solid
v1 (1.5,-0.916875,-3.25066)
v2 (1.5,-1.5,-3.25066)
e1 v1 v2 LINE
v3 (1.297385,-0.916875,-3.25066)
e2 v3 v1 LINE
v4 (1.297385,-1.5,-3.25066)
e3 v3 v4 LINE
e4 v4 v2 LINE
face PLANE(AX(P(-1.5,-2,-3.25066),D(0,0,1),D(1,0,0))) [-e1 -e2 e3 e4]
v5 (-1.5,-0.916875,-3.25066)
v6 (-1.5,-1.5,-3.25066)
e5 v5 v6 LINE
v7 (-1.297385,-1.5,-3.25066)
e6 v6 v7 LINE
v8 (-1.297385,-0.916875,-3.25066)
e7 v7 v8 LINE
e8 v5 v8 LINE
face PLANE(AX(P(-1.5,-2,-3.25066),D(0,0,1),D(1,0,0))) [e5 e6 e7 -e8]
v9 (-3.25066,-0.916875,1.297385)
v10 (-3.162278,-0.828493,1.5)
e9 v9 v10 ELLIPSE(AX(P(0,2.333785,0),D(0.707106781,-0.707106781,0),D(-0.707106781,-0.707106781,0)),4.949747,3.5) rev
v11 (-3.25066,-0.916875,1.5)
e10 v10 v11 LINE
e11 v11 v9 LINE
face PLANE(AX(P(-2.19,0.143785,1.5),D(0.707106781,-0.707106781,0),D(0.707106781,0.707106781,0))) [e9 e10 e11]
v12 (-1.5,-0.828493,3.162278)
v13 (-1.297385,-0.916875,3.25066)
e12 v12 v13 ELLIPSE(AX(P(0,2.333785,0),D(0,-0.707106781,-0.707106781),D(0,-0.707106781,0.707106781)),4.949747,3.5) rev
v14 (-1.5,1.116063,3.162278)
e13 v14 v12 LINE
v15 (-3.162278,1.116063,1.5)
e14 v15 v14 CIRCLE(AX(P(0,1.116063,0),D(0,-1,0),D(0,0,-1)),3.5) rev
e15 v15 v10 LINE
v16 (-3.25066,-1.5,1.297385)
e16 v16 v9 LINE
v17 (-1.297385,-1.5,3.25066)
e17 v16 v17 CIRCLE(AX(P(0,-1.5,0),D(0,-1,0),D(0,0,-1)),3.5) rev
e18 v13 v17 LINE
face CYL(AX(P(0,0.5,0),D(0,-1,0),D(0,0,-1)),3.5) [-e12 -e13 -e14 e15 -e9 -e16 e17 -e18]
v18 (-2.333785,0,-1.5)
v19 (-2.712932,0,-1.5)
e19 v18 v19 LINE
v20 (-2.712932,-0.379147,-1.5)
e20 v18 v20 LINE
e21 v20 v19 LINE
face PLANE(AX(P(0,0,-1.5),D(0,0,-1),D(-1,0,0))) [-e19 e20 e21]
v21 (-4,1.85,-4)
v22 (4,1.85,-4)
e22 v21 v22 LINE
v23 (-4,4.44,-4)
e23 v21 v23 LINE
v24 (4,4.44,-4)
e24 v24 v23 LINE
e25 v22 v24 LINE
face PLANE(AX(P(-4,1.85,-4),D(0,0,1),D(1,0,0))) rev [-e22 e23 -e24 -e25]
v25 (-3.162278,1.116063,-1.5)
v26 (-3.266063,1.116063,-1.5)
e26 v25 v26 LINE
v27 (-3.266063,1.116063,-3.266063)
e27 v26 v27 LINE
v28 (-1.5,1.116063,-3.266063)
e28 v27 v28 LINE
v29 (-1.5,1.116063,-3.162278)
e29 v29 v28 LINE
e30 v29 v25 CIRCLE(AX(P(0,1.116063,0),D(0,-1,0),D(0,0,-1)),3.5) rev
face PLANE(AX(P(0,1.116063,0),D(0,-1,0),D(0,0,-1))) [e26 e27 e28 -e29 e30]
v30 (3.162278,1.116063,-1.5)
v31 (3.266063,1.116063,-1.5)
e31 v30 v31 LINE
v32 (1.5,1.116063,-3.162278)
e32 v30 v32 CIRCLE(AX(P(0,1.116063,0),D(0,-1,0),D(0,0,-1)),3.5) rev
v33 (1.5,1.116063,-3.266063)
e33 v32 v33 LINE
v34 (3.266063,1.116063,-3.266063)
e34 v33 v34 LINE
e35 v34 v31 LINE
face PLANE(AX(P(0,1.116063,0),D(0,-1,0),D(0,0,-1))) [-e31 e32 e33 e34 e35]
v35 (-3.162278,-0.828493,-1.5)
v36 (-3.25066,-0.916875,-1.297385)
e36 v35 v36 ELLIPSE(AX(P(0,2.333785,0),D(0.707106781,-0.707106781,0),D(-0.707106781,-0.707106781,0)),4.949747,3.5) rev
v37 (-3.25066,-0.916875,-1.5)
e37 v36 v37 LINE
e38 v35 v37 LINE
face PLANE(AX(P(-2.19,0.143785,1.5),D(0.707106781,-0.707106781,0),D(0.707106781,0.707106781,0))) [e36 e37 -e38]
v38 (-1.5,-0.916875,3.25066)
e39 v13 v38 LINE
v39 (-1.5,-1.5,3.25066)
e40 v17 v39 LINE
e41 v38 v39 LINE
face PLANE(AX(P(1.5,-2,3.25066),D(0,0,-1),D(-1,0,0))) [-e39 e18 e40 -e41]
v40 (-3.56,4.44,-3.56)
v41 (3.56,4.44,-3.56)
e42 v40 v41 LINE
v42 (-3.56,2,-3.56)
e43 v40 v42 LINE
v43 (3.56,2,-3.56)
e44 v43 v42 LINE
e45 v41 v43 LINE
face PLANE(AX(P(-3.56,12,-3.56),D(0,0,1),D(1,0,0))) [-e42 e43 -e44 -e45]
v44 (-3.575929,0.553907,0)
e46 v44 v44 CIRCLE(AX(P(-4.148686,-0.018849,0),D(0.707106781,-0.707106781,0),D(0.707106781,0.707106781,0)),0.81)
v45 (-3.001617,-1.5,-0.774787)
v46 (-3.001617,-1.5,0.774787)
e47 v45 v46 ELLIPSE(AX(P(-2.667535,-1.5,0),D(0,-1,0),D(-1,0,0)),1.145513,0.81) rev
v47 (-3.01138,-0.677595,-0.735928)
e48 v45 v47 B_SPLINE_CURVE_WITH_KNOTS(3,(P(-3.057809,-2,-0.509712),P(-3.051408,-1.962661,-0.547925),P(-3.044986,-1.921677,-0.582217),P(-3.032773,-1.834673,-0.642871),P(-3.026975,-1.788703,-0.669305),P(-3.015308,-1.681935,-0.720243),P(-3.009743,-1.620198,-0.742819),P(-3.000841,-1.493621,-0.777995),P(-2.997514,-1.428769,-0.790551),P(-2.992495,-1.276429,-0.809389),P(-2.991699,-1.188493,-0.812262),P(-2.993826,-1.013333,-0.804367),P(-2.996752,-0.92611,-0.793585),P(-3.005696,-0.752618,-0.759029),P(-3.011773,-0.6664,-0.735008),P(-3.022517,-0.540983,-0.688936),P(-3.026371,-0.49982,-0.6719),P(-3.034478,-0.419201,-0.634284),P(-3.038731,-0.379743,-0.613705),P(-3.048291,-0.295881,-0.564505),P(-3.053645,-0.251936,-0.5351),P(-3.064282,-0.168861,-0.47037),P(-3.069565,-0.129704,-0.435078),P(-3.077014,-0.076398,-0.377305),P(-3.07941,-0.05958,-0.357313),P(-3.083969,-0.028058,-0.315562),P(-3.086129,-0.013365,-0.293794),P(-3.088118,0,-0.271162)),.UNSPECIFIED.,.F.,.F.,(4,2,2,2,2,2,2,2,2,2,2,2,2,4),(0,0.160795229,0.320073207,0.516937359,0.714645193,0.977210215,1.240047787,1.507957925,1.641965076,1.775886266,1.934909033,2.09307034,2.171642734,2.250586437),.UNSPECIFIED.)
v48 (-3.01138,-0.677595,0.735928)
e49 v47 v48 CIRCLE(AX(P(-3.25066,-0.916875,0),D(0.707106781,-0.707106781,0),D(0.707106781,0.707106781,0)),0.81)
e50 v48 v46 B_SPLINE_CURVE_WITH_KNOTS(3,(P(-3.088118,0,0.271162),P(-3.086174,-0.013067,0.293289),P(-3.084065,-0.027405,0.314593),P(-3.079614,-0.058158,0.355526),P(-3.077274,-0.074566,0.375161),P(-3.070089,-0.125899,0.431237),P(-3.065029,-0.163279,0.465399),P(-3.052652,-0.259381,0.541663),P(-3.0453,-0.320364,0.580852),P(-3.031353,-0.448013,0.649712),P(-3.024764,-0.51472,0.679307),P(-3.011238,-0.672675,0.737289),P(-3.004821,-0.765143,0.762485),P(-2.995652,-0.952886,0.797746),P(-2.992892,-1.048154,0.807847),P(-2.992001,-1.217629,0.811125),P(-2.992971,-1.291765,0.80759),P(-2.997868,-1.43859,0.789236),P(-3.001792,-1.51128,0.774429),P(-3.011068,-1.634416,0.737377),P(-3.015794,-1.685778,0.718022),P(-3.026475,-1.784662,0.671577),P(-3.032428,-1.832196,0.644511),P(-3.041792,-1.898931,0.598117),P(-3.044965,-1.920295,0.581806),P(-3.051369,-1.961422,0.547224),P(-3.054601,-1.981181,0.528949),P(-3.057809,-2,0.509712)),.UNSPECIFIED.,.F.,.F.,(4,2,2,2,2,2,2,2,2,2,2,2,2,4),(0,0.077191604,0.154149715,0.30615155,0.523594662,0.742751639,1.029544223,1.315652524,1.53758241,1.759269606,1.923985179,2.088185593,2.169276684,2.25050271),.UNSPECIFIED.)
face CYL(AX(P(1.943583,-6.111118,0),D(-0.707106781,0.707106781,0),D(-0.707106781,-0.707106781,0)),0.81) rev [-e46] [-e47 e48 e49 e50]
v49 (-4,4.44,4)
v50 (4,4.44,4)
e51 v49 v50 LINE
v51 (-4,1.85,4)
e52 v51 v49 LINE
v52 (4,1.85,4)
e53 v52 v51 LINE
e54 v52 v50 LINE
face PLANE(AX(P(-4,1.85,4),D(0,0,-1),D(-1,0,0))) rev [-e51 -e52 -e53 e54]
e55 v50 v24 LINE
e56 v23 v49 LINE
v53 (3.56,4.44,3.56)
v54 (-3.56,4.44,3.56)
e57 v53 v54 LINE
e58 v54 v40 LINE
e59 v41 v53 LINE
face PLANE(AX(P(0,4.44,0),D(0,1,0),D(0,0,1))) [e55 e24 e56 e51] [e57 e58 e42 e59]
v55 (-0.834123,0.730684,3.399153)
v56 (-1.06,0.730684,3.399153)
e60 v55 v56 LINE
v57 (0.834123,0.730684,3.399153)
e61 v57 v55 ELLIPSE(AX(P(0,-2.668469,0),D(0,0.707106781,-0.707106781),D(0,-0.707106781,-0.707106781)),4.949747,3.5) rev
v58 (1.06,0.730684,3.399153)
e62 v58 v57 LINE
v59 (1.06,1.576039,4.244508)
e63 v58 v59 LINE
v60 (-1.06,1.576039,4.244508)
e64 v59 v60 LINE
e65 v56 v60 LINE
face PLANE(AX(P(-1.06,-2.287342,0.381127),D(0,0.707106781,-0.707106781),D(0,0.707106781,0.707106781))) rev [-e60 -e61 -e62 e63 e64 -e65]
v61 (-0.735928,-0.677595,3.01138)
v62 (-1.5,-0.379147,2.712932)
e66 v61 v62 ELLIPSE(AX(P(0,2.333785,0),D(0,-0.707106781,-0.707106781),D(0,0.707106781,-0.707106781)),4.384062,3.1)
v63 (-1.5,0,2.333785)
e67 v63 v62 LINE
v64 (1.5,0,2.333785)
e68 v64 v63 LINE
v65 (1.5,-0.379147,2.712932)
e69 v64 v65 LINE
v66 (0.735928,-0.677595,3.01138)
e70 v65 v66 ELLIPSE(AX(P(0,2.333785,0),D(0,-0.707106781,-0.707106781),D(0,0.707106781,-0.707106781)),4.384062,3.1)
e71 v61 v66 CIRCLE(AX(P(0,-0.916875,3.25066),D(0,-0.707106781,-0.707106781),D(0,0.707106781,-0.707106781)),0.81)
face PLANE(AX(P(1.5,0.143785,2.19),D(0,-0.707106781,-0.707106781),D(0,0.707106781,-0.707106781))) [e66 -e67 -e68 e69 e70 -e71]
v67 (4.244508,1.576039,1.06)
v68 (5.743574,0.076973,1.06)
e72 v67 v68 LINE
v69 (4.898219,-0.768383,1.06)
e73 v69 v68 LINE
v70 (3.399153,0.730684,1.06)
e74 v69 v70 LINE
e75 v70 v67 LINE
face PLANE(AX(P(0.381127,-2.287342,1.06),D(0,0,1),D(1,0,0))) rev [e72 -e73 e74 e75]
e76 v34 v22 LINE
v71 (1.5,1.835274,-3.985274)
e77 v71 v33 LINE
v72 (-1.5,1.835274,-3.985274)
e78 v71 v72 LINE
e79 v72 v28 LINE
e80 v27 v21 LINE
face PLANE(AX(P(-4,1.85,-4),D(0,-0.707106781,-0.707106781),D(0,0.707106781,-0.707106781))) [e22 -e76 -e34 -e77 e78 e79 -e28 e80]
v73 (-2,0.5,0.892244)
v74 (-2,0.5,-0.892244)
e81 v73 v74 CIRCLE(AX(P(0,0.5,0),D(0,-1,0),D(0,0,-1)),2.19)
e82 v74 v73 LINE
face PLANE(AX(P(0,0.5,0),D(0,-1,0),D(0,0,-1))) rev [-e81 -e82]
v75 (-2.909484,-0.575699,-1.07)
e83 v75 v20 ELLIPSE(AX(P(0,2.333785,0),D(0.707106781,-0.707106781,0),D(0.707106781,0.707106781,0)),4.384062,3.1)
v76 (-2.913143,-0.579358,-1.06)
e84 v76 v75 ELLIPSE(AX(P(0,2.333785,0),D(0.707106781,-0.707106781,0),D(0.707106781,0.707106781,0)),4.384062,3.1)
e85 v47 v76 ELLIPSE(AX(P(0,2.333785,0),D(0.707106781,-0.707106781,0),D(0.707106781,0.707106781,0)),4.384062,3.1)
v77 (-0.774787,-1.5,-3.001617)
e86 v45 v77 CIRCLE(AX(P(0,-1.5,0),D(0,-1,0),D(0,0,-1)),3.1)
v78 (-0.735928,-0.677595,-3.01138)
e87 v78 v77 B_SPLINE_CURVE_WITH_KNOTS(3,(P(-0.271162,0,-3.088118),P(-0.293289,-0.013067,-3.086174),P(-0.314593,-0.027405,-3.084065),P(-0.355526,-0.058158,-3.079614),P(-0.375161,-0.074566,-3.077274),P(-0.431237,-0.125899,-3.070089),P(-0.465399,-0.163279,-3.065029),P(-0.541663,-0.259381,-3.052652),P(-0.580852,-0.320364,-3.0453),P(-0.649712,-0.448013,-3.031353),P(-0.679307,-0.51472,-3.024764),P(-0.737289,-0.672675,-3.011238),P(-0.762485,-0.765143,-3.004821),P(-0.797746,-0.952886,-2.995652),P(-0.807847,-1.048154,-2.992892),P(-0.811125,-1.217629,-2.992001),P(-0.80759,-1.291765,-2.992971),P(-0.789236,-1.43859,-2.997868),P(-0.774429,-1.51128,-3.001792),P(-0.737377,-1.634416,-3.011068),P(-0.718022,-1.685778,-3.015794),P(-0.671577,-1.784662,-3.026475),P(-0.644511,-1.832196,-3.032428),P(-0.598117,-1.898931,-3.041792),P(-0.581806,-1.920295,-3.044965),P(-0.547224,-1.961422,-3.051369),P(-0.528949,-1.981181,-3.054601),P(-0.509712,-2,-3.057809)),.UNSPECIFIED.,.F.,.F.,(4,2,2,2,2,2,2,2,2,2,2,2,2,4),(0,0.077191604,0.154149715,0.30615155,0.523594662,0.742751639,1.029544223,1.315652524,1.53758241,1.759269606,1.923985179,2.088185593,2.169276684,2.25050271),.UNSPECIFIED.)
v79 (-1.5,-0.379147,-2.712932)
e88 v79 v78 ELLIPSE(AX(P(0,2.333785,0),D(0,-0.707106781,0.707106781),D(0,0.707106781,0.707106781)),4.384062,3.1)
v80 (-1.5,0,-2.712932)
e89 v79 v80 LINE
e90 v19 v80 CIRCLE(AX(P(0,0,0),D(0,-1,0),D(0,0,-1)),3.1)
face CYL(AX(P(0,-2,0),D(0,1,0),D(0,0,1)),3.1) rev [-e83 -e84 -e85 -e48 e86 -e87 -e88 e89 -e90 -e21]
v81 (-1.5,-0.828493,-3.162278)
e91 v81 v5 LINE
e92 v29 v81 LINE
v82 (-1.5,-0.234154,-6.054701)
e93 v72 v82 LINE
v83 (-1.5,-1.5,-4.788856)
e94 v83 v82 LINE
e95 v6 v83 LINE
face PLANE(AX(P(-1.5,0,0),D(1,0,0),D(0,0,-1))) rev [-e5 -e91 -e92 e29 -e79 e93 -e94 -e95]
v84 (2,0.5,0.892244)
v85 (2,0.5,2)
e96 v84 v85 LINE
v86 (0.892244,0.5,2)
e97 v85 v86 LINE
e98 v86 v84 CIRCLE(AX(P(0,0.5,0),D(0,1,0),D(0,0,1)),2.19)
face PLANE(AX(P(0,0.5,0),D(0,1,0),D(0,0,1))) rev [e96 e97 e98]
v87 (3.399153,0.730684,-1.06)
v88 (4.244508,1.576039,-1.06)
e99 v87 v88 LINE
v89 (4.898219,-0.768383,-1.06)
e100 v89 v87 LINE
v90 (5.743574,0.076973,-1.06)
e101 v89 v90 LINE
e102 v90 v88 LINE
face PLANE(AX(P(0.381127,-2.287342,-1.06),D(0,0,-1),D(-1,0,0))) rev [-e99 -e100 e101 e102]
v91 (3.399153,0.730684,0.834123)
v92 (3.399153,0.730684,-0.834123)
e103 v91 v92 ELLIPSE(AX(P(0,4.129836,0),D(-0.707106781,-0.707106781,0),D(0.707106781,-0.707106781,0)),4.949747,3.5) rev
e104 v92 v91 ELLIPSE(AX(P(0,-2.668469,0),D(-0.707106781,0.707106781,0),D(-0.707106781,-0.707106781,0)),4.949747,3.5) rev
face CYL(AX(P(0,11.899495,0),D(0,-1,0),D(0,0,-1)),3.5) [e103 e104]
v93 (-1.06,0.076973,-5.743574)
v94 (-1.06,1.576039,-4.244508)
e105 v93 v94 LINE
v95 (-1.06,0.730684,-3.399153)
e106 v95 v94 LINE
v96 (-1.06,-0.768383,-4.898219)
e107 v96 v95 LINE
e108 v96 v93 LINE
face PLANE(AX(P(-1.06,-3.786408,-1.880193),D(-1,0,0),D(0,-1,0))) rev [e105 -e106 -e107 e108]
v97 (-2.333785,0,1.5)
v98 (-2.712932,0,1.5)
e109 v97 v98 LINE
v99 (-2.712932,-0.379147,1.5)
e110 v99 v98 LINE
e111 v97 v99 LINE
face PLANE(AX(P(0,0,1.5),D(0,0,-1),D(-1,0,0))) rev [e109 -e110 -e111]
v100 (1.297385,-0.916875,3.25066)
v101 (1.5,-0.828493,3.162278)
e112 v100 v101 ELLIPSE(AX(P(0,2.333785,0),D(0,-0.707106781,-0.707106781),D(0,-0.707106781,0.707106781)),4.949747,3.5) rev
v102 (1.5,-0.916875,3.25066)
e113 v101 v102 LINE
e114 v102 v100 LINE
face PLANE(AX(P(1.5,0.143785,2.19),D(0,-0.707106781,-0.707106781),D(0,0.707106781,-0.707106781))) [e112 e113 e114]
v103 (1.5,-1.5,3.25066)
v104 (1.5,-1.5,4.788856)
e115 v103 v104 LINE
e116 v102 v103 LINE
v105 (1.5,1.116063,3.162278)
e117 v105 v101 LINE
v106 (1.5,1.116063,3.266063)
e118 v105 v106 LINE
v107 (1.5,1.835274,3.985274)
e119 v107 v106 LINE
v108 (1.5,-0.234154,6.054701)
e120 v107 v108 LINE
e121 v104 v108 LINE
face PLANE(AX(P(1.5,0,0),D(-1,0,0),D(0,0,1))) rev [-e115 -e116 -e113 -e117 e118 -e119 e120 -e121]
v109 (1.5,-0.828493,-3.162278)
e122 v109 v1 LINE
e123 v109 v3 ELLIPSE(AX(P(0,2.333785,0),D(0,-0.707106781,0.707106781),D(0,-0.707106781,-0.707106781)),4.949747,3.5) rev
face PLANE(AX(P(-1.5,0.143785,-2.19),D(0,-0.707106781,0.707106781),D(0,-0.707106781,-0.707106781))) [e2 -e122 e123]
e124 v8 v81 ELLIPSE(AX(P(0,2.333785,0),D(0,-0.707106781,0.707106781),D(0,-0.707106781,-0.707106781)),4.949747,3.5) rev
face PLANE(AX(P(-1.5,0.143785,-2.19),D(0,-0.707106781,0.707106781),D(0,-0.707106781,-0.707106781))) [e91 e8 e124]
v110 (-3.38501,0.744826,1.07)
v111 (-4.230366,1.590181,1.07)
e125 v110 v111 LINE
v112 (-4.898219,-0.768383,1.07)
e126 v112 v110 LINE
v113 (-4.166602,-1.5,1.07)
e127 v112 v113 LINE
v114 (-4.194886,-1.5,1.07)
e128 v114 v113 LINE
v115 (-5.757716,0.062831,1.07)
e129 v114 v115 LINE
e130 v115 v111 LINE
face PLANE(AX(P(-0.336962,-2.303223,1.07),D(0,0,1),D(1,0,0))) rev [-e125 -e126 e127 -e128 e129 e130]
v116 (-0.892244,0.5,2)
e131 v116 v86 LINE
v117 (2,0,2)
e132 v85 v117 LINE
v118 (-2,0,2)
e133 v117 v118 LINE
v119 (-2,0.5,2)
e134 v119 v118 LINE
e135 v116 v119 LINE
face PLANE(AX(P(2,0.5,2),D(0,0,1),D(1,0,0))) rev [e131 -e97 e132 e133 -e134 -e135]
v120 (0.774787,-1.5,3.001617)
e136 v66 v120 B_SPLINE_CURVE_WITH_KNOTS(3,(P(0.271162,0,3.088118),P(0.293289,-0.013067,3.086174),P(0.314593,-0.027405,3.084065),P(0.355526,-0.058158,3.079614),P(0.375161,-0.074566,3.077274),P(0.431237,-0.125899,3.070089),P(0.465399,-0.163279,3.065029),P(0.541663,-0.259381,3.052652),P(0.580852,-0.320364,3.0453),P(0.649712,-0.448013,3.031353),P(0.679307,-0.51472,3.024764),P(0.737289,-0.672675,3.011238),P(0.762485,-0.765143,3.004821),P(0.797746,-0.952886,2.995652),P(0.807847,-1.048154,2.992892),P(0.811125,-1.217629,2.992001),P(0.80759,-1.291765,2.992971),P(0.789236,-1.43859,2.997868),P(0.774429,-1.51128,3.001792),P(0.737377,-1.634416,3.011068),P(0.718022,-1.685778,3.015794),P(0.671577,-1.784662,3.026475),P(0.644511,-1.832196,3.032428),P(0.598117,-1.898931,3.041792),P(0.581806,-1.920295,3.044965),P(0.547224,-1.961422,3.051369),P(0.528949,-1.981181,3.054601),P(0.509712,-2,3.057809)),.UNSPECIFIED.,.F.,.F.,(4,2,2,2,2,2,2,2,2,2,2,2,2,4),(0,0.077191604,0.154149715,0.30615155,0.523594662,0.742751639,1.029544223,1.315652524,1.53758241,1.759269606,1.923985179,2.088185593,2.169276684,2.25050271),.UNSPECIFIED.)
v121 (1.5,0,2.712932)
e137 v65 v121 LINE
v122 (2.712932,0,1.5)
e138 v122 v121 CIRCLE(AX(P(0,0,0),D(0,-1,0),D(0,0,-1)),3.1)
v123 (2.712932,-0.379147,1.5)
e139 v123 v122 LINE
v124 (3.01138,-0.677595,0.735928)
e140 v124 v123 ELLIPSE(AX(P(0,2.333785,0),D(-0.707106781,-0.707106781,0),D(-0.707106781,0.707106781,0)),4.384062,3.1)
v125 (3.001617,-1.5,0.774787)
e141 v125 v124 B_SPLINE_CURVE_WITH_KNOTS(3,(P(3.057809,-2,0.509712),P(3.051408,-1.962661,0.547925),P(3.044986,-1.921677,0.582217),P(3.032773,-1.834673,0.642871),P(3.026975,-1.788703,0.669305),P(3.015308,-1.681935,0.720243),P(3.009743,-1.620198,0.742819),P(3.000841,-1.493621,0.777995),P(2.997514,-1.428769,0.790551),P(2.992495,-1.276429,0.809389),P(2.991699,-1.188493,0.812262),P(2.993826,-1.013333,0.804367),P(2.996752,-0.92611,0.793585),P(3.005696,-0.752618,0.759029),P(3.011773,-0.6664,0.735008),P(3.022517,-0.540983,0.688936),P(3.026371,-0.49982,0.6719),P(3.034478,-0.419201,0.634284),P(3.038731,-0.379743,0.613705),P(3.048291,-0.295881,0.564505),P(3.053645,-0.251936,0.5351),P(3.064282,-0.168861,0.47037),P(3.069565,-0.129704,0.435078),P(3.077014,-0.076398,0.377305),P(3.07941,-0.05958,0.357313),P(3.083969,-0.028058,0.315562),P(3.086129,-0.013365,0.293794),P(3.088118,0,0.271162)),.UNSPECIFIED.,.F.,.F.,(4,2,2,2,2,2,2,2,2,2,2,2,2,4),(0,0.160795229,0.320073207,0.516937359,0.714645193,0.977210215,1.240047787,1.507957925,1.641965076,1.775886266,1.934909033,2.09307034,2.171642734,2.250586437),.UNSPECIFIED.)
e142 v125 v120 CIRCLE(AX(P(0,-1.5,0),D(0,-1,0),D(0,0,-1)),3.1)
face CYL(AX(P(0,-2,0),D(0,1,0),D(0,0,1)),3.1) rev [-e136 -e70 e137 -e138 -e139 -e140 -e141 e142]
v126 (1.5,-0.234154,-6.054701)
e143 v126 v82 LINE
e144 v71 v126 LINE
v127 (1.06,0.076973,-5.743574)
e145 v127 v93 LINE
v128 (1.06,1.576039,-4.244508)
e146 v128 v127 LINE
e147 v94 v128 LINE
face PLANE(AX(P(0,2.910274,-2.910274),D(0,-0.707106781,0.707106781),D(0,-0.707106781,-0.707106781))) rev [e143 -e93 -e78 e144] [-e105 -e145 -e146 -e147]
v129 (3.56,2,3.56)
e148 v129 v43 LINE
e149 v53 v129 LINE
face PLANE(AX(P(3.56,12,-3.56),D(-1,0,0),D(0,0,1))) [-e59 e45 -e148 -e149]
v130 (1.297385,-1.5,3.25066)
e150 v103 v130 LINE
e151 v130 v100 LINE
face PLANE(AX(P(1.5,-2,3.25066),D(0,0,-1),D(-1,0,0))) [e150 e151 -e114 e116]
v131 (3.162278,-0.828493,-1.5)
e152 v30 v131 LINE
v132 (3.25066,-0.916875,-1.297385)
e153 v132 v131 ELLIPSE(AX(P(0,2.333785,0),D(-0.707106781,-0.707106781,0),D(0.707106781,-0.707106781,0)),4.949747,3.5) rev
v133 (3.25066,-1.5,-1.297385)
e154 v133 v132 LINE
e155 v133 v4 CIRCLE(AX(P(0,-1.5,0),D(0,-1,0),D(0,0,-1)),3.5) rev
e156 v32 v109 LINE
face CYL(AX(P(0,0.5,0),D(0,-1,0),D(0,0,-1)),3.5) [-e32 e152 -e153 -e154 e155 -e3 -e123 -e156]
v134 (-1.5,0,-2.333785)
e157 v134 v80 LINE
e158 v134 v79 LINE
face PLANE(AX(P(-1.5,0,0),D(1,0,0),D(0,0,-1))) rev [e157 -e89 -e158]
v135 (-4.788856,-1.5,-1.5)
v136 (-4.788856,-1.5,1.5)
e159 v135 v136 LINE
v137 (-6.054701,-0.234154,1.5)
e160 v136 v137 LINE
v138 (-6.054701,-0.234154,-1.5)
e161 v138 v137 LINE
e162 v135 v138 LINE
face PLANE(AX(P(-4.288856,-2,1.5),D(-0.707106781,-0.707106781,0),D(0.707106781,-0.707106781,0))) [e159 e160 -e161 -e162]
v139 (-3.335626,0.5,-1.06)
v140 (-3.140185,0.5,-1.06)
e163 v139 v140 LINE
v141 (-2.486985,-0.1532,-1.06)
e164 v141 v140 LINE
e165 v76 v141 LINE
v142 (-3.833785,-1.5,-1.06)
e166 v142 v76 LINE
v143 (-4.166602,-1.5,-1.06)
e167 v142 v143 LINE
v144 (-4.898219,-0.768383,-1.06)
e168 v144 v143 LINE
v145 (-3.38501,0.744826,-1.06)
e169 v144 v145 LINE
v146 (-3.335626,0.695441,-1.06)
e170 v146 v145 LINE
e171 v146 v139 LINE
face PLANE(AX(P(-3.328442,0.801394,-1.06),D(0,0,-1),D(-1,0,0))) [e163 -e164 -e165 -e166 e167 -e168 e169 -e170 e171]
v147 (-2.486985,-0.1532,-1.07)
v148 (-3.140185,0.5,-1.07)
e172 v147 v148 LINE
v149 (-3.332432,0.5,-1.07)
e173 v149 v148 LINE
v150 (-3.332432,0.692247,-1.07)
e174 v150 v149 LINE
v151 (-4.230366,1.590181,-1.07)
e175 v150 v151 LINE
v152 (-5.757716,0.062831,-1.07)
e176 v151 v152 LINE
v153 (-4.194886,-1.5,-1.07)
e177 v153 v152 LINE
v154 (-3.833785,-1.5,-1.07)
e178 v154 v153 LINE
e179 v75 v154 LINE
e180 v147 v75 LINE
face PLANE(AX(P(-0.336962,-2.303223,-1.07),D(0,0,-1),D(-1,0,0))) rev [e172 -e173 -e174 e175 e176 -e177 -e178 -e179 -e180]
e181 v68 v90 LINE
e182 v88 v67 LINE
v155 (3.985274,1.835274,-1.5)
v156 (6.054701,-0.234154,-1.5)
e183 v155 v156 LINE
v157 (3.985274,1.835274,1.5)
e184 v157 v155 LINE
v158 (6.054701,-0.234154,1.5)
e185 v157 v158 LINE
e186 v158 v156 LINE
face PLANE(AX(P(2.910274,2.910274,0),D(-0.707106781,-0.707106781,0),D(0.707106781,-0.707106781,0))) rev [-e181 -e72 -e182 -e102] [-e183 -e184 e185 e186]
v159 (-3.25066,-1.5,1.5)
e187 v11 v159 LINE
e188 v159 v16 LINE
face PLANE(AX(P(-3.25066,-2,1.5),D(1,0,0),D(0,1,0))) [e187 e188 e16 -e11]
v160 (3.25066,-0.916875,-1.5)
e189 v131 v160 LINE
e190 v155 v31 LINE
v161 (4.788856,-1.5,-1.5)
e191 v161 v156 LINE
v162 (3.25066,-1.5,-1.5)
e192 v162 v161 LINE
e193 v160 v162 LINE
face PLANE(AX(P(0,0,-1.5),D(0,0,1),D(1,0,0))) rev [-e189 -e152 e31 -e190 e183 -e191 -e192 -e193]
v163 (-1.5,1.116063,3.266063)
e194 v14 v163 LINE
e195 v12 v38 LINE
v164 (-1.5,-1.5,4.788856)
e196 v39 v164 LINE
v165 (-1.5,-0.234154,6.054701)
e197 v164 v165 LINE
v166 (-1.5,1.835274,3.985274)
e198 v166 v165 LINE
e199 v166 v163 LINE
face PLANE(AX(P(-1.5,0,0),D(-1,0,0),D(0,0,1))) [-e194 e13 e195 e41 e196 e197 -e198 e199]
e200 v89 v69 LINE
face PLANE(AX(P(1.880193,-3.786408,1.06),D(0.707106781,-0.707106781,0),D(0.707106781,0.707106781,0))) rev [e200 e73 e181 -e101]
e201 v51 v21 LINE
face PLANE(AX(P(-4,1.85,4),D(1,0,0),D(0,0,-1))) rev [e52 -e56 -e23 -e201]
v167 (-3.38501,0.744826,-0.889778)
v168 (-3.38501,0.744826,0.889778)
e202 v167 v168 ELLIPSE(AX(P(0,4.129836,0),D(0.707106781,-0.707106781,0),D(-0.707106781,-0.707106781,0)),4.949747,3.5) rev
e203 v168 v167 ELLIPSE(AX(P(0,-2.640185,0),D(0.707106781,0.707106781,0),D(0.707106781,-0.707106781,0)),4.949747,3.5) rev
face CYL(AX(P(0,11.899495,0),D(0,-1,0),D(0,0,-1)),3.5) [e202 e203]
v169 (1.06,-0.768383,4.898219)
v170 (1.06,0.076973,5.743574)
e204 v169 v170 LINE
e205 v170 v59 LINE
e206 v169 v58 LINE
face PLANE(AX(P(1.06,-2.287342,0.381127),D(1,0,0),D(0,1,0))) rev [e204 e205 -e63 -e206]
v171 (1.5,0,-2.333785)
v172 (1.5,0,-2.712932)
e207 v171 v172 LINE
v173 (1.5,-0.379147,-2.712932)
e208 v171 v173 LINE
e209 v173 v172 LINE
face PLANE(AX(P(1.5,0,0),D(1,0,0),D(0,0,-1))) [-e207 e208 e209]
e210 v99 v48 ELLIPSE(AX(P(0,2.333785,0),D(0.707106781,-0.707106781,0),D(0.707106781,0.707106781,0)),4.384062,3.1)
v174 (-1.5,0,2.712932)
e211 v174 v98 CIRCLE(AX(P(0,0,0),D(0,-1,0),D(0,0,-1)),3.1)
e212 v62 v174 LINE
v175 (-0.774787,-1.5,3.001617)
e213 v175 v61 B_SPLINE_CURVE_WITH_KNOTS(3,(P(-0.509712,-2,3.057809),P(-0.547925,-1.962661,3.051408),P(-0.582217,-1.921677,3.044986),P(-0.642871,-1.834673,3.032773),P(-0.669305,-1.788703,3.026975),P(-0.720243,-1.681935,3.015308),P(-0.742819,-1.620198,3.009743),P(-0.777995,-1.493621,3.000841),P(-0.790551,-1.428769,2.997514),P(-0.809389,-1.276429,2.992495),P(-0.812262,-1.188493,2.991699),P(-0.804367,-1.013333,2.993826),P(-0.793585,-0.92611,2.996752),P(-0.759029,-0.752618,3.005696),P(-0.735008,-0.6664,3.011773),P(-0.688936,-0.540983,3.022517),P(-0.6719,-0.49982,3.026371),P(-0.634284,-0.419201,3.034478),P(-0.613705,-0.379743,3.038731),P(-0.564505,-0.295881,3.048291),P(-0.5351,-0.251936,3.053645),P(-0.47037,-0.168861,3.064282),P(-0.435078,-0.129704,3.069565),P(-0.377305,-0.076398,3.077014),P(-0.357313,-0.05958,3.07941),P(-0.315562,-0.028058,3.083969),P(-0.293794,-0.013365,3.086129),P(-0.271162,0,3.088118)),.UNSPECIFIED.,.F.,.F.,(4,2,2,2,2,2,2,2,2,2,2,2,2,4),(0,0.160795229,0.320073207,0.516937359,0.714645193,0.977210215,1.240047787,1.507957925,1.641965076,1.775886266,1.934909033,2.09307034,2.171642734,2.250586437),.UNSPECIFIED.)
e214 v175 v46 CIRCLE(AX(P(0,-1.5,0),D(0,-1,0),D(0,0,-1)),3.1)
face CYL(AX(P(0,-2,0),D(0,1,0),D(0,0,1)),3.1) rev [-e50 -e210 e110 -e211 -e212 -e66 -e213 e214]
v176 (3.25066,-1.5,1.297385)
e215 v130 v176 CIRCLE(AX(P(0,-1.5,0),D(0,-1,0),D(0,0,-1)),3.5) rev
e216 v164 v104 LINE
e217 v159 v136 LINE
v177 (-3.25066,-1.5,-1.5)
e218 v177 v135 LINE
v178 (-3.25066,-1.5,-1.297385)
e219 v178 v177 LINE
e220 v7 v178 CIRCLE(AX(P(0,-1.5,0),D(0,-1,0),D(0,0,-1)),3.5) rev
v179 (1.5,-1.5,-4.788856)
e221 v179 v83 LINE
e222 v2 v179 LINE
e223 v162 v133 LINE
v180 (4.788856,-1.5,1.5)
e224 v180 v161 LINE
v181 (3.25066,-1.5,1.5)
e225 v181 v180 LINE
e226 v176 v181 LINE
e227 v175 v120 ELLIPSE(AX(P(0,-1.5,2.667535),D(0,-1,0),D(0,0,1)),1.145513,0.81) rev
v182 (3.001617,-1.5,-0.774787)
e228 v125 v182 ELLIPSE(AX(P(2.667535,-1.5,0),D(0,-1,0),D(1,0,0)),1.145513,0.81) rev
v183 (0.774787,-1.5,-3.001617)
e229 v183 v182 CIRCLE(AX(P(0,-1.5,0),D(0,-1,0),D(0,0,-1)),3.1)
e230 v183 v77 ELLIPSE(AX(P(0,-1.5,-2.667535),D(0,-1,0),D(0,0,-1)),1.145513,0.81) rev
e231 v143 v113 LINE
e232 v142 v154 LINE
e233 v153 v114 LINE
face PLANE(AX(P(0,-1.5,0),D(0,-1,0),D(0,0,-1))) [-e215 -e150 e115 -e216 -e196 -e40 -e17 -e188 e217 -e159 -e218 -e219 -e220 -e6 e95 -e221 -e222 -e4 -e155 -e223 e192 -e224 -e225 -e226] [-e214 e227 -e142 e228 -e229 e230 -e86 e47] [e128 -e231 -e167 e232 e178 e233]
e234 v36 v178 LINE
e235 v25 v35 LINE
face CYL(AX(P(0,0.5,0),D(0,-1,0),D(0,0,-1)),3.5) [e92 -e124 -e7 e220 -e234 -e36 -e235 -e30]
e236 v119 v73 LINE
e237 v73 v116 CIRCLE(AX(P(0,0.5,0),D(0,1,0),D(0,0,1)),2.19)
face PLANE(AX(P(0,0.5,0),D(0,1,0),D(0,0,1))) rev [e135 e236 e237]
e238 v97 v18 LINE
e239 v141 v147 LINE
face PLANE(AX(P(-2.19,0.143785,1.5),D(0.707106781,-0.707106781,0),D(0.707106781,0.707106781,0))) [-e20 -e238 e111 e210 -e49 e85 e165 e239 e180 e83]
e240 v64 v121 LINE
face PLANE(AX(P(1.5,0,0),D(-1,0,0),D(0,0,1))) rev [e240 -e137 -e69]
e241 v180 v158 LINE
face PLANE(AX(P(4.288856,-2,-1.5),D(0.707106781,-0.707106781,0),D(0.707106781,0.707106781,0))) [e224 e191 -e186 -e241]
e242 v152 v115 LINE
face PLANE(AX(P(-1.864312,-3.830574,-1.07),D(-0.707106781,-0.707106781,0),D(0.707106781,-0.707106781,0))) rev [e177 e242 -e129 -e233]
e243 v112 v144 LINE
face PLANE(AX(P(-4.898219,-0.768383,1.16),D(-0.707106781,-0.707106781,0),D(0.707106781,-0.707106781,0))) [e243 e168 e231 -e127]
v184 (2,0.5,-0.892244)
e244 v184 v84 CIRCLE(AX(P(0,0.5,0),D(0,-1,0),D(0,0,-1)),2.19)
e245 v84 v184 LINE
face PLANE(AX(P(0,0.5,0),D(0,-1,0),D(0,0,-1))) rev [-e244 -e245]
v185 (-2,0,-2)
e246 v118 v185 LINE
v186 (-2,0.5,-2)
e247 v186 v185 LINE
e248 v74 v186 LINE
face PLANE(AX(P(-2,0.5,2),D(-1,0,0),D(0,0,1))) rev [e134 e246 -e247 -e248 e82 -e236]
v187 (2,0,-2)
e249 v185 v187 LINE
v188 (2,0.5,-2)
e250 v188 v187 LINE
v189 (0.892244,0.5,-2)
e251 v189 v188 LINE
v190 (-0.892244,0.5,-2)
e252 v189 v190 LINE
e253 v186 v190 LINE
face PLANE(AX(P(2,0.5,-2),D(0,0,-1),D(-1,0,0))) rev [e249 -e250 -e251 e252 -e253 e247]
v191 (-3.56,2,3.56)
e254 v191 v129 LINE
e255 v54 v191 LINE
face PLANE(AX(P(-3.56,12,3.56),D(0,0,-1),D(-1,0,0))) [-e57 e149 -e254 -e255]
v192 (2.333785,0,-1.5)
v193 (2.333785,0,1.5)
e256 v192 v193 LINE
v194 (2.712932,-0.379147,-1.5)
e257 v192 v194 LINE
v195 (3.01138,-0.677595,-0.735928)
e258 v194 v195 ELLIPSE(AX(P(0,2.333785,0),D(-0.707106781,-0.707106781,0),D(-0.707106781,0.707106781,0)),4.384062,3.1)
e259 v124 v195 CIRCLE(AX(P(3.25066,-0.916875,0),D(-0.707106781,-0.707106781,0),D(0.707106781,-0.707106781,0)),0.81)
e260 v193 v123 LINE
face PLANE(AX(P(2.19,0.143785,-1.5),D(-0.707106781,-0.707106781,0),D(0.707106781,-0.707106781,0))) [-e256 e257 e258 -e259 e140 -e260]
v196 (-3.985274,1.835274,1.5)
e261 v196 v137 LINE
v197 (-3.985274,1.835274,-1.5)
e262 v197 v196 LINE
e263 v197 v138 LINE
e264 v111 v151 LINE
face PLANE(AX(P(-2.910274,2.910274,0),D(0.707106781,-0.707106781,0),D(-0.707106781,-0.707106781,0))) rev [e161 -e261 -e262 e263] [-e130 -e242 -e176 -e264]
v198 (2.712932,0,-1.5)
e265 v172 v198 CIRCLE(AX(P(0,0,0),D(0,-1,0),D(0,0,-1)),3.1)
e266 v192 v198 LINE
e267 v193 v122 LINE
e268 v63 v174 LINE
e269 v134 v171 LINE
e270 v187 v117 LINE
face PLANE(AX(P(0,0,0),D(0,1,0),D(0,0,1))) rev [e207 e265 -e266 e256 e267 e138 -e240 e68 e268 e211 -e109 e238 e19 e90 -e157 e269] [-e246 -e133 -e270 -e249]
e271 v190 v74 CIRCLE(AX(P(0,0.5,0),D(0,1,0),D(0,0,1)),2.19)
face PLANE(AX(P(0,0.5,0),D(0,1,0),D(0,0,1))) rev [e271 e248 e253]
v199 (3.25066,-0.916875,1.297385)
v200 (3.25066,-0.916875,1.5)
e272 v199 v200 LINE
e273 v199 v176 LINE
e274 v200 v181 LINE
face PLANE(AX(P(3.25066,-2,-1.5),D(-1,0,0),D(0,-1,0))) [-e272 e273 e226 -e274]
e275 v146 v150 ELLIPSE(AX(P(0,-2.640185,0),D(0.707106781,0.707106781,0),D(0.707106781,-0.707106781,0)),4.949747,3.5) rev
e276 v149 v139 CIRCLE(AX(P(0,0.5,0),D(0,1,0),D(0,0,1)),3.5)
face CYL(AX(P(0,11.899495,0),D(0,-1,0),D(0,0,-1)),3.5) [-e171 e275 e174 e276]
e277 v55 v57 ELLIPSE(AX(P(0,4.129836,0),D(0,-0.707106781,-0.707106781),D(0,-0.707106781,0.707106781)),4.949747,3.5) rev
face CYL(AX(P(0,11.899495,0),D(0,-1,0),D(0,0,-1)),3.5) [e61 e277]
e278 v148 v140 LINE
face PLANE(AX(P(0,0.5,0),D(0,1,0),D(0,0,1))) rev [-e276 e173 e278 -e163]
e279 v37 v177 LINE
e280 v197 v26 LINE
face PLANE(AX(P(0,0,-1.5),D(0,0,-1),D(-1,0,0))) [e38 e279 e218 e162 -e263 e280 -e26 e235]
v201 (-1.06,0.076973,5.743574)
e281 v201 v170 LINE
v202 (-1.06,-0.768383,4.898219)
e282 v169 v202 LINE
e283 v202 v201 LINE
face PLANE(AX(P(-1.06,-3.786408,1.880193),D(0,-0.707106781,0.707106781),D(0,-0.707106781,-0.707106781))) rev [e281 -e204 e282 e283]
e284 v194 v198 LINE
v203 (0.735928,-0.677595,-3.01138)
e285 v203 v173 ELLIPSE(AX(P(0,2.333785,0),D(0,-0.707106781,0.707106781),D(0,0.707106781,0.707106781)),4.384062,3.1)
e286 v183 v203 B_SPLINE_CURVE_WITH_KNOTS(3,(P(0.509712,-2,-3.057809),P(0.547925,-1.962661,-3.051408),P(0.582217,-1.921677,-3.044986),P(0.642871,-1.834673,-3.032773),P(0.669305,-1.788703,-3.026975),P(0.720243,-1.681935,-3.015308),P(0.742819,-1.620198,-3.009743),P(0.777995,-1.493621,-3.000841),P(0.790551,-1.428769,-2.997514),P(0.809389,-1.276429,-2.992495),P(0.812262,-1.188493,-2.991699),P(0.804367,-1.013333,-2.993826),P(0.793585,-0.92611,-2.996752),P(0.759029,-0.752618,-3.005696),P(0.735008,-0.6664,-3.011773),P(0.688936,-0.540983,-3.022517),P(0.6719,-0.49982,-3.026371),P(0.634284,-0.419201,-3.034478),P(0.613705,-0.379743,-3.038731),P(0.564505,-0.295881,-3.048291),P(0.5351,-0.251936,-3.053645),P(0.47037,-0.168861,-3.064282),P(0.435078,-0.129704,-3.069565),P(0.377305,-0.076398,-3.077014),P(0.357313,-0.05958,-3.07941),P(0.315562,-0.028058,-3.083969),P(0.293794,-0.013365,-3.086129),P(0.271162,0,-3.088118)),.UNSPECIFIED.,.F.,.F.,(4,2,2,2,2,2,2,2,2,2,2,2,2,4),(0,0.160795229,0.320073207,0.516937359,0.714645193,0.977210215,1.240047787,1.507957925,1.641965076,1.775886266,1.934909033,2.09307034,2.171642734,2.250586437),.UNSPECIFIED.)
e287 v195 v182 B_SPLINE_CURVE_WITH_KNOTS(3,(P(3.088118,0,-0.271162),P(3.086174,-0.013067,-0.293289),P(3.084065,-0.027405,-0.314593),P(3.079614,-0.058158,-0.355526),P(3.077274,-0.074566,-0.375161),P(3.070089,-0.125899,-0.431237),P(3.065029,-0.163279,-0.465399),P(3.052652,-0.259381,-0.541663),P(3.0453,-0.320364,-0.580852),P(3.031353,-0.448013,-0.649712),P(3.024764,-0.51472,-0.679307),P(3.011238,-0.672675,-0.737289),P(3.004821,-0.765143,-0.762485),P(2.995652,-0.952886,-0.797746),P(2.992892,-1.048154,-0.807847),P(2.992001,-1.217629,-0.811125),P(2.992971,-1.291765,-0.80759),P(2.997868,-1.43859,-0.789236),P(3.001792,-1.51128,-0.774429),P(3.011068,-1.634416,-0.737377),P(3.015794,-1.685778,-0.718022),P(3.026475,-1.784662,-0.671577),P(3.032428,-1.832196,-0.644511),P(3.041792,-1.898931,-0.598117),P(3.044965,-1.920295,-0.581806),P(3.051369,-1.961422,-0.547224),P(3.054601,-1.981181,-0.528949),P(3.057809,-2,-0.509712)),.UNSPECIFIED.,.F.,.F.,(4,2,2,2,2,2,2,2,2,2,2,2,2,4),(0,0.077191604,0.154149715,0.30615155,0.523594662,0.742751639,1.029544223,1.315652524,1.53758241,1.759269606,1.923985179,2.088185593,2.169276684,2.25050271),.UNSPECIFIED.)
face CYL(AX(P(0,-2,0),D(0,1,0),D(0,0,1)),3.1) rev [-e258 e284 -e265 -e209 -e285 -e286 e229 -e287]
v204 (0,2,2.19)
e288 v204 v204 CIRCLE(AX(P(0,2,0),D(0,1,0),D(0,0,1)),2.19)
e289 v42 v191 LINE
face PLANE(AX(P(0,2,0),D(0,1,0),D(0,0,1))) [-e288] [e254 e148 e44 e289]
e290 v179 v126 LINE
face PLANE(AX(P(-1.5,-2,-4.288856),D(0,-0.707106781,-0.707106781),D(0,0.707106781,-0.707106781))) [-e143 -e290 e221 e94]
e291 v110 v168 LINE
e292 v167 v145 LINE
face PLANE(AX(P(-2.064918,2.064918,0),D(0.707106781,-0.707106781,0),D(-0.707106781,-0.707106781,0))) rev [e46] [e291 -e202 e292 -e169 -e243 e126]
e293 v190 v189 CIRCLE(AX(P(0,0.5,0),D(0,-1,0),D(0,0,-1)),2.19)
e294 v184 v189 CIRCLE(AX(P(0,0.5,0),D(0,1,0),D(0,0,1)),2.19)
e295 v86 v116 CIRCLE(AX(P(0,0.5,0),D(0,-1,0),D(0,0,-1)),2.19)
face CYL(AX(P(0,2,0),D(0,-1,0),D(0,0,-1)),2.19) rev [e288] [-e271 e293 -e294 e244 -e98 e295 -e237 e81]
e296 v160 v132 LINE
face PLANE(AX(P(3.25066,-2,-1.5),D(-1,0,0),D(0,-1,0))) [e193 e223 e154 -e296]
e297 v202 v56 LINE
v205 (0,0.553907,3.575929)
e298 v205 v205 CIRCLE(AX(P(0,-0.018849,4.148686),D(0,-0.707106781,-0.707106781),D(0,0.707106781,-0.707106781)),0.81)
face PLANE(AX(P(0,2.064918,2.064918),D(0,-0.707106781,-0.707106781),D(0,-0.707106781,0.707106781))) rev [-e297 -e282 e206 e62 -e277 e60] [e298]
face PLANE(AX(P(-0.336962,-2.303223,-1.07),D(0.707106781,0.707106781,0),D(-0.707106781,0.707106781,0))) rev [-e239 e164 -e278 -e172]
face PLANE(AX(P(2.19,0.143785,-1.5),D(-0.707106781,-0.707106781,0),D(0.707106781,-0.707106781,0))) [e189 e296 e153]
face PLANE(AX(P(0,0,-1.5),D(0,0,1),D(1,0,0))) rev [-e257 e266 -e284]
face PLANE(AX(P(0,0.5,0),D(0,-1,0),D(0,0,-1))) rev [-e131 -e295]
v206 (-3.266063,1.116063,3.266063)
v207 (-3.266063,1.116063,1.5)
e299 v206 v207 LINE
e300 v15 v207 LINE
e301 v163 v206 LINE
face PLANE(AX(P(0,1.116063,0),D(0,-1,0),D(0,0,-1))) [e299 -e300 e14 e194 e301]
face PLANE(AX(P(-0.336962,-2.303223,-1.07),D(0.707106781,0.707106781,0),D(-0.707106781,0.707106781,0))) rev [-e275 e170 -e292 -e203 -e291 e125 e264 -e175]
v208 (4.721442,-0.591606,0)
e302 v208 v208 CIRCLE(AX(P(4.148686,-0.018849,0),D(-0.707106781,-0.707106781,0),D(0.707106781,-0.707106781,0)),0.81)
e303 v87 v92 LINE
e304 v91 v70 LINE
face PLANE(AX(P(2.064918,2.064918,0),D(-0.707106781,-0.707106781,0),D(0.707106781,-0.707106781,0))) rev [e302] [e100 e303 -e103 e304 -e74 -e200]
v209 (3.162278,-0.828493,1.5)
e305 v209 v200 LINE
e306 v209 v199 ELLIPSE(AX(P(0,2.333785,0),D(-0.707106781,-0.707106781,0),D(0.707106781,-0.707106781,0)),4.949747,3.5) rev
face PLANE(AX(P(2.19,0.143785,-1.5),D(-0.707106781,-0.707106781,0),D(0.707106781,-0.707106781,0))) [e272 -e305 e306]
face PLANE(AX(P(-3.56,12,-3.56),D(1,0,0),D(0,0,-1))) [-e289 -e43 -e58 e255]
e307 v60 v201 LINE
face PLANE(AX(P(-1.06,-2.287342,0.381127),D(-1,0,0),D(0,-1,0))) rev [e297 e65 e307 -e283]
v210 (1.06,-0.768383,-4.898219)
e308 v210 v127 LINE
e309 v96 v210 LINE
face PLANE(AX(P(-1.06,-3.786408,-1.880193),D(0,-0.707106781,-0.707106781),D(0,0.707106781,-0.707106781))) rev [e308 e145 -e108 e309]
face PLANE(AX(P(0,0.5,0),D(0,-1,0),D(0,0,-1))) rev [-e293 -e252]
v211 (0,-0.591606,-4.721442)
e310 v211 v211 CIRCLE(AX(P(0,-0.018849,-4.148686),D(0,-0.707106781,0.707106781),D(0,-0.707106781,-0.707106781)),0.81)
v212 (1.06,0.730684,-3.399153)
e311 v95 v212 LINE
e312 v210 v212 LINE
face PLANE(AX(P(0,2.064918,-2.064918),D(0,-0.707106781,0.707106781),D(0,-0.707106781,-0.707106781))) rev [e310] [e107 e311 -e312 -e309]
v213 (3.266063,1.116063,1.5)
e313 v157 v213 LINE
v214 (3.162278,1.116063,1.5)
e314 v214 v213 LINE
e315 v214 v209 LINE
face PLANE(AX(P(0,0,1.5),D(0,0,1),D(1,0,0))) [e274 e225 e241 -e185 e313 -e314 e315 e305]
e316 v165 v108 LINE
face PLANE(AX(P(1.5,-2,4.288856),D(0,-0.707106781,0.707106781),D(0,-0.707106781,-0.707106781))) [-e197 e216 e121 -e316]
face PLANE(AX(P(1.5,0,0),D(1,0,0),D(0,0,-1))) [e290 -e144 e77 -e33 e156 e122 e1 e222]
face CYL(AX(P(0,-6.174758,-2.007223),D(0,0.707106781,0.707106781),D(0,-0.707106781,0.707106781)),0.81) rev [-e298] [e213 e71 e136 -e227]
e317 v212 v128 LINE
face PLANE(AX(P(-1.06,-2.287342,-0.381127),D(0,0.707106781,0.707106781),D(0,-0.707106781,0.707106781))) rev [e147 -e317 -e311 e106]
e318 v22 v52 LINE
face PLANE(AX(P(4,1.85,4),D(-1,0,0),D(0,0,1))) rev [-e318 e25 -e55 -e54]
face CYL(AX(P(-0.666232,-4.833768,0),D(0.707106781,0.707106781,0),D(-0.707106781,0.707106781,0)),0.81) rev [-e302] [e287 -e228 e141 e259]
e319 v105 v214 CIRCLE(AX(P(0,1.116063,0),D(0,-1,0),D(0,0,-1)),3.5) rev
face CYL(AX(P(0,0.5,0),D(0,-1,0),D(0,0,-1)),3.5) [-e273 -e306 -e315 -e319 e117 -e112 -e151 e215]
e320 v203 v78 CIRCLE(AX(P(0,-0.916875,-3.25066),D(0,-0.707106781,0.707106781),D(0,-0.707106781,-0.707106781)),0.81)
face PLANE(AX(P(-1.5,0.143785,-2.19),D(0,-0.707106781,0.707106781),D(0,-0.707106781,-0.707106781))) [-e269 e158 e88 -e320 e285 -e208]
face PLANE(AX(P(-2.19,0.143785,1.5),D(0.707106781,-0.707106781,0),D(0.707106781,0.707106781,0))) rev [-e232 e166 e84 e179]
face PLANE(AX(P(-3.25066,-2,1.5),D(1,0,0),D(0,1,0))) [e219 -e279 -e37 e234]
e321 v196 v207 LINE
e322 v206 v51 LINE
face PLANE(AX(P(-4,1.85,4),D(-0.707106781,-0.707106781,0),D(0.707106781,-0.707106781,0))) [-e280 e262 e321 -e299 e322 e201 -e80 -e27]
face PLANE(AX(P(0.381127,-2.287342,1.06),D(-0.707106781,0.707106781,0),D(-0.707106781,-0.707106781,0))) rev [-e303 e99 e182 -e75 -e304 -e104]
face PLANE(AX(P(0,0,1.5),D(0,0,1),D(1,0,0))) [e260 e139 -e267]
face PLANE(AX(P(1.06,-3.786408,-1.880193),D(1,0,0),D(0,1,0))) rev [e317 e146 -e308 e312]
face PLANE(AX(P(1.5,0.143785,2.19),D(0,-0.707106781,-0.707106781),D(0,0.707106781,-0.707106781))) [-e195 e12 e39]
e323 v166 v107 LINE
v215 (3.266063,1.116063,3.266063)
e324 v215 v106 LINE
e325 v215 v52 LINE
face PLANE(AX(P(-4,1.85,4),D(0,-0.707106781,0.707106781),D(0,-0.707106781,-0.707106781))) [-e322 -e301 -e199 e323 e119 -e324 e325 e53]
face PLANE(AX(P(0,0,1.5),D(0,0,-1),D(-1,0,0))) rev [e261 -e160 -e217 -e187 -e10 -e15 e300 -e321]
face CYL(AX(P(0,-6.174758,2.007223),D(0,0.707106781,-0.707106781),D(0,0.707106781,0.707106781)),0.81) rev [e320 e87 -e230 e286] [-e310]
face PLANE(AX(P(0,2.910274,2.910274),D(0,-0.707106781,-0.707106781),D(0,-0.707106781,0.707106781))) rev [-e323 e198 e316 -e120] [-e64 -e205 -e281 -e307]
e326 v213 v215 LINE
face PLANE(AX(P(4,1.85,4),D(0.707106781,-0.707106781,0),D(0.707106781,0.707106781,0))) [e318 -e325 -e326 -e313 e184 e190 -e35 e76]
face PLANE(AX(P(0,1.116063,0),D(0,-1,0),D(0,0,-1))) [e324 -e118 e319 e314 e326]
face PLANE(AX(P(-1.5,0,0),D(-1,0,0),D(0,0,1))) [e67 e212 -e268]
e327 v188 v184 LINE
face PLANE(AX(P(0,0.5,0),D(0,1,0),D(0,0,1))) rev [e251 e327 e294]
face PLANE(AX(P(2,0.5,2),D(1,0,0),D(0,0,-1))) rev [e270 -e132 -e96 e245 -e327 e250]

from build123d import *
from build123d.topology import SkipClean

# Parameters (mm, degrees)
SKETCH6_R            = 3
SKETCH6_R_2          = 2.19
BOSS_EXTRUDE3_DEPTH  = 2
SKETCH7_W            = 4
SKETCH7_H            = 4
CUT_EXTRUDE2_DEPTH   = 0.5
BOSS_EXTRUDE5_START  = 0.5
BOSS_EXTRUDE5_DEPTH  = 0.5
SKETCH17_R           = 3.5
SKETCH17_R_2         = 3
BOSS_EXTRUDE11_DEPTH = 0.5
BOSS_EXTRUDE12_START = 2
SKETCH18_R           = 3.5
SKETCH18_R_2         = 3.1
BOSS_EXTRUDE12_DEPTH = 2
BOSS_EXTRUDE13_DEPTH = 1.5
SKETCH29_W           = 3
SKETCH29_H           = 3
BOSS_EXTRUDE16_DEPTH = 1.5
SKETCH30_W           = 2.12
SKETCH30_H           = 2.12
CUT_EXTRUDE10_DEPTH  = 2.645512986
SKETCH31_W           = 2.22
SKETCH31_H           = 2.22
BOSS_EXTRUDE17_DEPTH = 1.27
SKETCH32_R           = 0.81
CUT_EXTRUDE11_DEPTH  = 8.729286762
SKETCH33_W           = 3.2
SKETCH33_H           = 3.2
CUT_EXTRUDE12_DEPTH  = 0.18
CIRPATTERN3_COUNT    = 4
SKETCH34_W           = 2.14
SKETCH34_H           = 2.16
CUT_EXTRUDE13_DEPTH  = 2.645512986
SKETCH35_W           = 2.12
SKETCH35_H           = 2.12
CUT_EXTRUDE14_DEPTH  = 2.645512986
SKETCH36_W           = 2.12
SKETCH36_H           = 2.12
CUT_EXTRUDE15_DEPTH  = 2.645512986
CIRPATTERN16_COUNT   = 4
SKETCH37_R           = 10
CUT_EXTRUDE17_DEPTH  = 0.5
SKETCH38_R           = 3.5
SKETCH38_R_2         = 2.85
BOSS_EXTRUDE18_DEPTH = 1.5
SKETCH39_W           = 2.12
SKETCH39_H           = 2.12
CUT_EXTRUDE18_DEPTH  = 0.5
SKETCH40_W           = 8
SKETCH40_H           = 8
SKETCH40_W_2         = 7
SKETCH40_H_2         = 7
BOSS_EXTRUDE19_DEPTH = 2.44
BOSS_EXTRUDE20_START = 0.15
SKETCH41_W           = 8
SKETCH41_H           = 8
SKETCH41_R           = 2.19
BOSS_EXTRUDE20_DEPTH = 0.15
SKETCH42_W           = 8
SKETCH42_H           = 8
SKETCH42_R           = 2.19
BOSS_EXTRUDE21_DEPTH = 0.733937
BOSS_EXTRUDE21_DRAFT = 45
SKETCH43_W           = 7.12
SKETCH43_H           = 7.12
CUT_EXTRUDE19_DEPTH  = 10


with BuildPart() as part:
    # Sketch6 → Boss-Extrude3 (new body)
    with BuildSketch(Plane(origin=(0, 0, 0), x_dir=(1, 0, 0), z_dir=(0, 1, 0))):
        with Locations(Location((0, 0, 0), (0, 0, 270))):
            Circle(SKETCH6_R)
        with Locations(Location((0, 0, 0), (0, 0, 270))):
            Circle(SKETCH6_R_2, mode=Mode.SUBTRACT)
    extrude(amount=BOSS_EXTRUDE3_DEPTH)

    # Sketch7 → Cut-Extrude2 (cut)
    with BuildSketch(Plane(origin=(0, 0, 0), x_dir=(-1, 0, 0), z_dir=(0, -1, 0))):
        Rectangle(SKETCH7_W, SKETCH7_H)
    extrude(amount=-CUT_EXTRUDE2_DEPTH, mode=Mode.SUBTRACT)

    # Sketch8 → Boss-Extrude5 (add)
    with BuildSketch(Plane(origin=(0, 0.5, 0), x_dir=(-1, 0, 0), z_dir=(0, -1, 0)).offset(BOSS_EXTRUDE5_START)):
        with BuildLine():
            Line((-0.892244361, 2), (0.892244361, 2))
            ThreePointArc((0.892244361, 2), (0, 2.19), (-0.892244361, 2))
        make_face()
        with BuildLine():
            Line((-2, 0.892244361), (-2, -0.892244361))
            ThreePointArc((-2, -0.892244361), (-2.19, 0), (-2, 0.892244361))
        make_face()
        with BuildLine():
            Line((-0.892244361, -2), (0.892244361, -2))
            ThreePointArc((0.892244361, -2), (0, -2.19), (-0.892244361, -2))
        make_face()
        with BuildLine():
            Line((2, 0.892244361), (2, -0.892244361))
            ThreePointArc((2, -0.892244361), (2.19, 0), (2, 0.892244361))
        make_face()
    extrude(amount=-BOSS_EXTRUDE5_DEPTH)

    # Sketch17 → Boss-Extrude11 (add)
    with BuildSketch(Plane(origin=(0, 0, 0), x_dir=(-1, 0, 0), z_dir=(0, -1, 0))):
        with Locations(Location((0, 0, 0), (0, 0, 90))):
            Circle(SKETCH17_R)
        with Locations(Location((0, 0, 0), (0, 0, 90))):
            Circle(SKETCH17_R_2, mode=Mode.SUBTRACT)
    extrude(amount=-BOSS_EXTRUDE11_DEPTH)

    # Sketch18 → Boss-Extrude12 (add)
    with BuildSketch(Plane(origin=(0, 0, 0), x_dir=(-1, 0, 0), z_dir=(0, -1, 0)).offset(BOSS_EXTRUDE12_START)):
        with Locations(Location((0, 0, 0), (0, 0, 90))):
            Circle(SKETCH18_R)
        with Locations(Location((0, 0, 0), (0, 0, 90))):
            Circle(SKETCH18_R_2, mode=Mode.SUBTRACT)
    extrude(amount=-BOSS_EXTRUDE12_DEPTH)

    # Sketch19 → Boss-Extrude13 (add, symmetric)
    with BuildSketch(Plane.XY):
        Polygon((4.288855584, -2), (5.121320344, -1.167535241), (3, 0.953785103), (2.19, 0.143785103), (3.250660172, -0.916875069), (3.250660172, -2), (4.033756176, -2), align=None)
    boss_extrude13 = extrude(amount=BOSS_EXTRUDE13_DEPTH, both=True)

    # Sketch29 → Boss-Extrude16 (add)
    with BuildSketch(Plane(origin=(1.976892551, 1.976892551, 0), x_dir=(0, 0, -1), z_dir=(0.707106781186548, 0.7071067811865471, 0))):
        with Locations((0, -2.94689243)):
            Rectangle(SKETCH29_W, SKETCH29_H)
    boss_extrude16 = extrude(amount=BOSS_EXTRUDE16_DEPTH)

    # Sketch30 → Cut-Extrude10 (cut)
    with BuildSketch(Plane(origin=(3.037552723, 3.037552723, 0), x_dir=(0, 0, -1), z_dir=(0.707106781186548, 0.7071067811865471, 0))):
        with Locations((0, -2.94689243)):
            Rectangle(SKETCH30_W, SKETCH30_H)
    extrude(amount=-CUT_EXTRUDE10_DEPTH, mode=Mode.SUBTRACT)

    # Sketch31 → Boss-Extrude17 (add)
    with BuildSketch(Plane(origin=(1.166892551, 1.166892551, 0), x_dir=(0, 0, 1), z_dir=(-0.7071067811865441, -0.7071067811865509, 0))):
        with Locations((-0.05, -2.89689243)):
            Rectangle(SKETCH31_W, SKETCH31_H)
    boss_extrude17 = extrude(amount=-BOSS_EXTRUDE17_DEPTH)

    # Sketch32 → Cut-Extrude11 (cut, symmetric)
    with BuildSketch(Plane(origin=(2.064918163, 2.064918163, 0), x_dir=(0, 0, -1), z_dir=(0.7071067811865444, 0.7071067811865508, 0))):
        with Locations(Location((0, -2.94689243, 0), (0, 0, 155.306163656))):
            Circle(SKETCH32_R)
    cut_extrude11 = extrude(amount=CUT_EXTRUDE11_DEPTH, both=True, mode=Mode.SUBTRACT)

    # Sketch33 → Cut-Extrude12 (cut)
    with BuildSketch(Plane(origin=(3.037552723, 3.037552723, 0), x_dir=(0, 0, -1), z_dir=(0.707106781186548, 0.7071067811865471, 0))):
        with Locations((0, -2.94689243)):
            Rectangle(SKETCH33_W, SKETCH33_H)
    cut_extrude12 = extrude(amount=-CUT_EXTRUDE12_DEPTH, mode=Mode.SUBTRACT)

    # CirPattern3: Boss-Extrude13, Boss-Extrude16 ×4 about axis
    cirpattern3_axis = Axis((0, 0, 0), (0, 1, 0))
    add([boss_extrude13.rotate(cirpattern3_axis, i * 360 / CIRPATTERN3_COUNT) for i in range(1, CIRPATTERN3_COUNT)])
    add([boss_extrude16.rotate(cirpattern3_axis, i * 360 / CIRPATTERN3_COUNT) for i in range(1, CIRPATTERN3_COUNT)])

    # Sketch34 → Cut-Extrude13 (cut)
    with BuildSketch(Plane(origin=(-3.037552723, 3.037552723, 0), x_dir=(0, 0, 1), z_dir=(-0.707106781186548, 0.7071067811865471, 0))):
        with Locations((0, -2.94689243)):
            Rectangle(SKETCH34_W, SKETCH34_H)
    extrude(amount=-CUT_EXTRUDE13_DEPTH, mode=Mode.SUBTRACT)

    # Sketch35 → Cut-Extrude14 (cut)
    with BuildSketch(Plane(origin=(0, 3.037552723, -3.037552723), x_dir=(1, 0, 0), z_dir=(7.355440612690688e-15, 0.7071067811865471, -0.707106781186548))):
        with Locations((0, 2.94689243)):
            Rectangle(SKETCH35_W, SKETCH35_H)
    extrude(amount=-CUT_EXTRUDE14_DEPTH, mode=Mode.SUBTRACT)

    # Sketch36 → Cut-Extrude15 (cut)
    with BuildSketch(Plane(origin=(0, 3.037552723, 3.037552723), x_dir=(1, 0, 0), z_dir=(-2.417740350526155e-15, 0.7071067811865471, 0.707106781186548))):
        with Locations((0, -2.94689243)):
            Rectangle(SKETCH36_W, SKETCH36_H)
    extrude(amount=-CUT_EXTRUDE15_DEPTH, mode=Mode.SUBTRACT)

    # CirPattern16: Boss-Extrude17, Cut-Extrude11, Cut-Extrude12 ×4 about axis
    cirpattern16_axis = Axis((0, 0, 0), (0, 1, 0))
    add([boss_extrude17.rotate(cirpattern16_axis, i * 360 / CIRPATTERN16_COUNT) for i in range(1, CIRPATTERN16_COUNT)])
    add([cut_extrude11.rotate(cirpattern16_axis, i * 360 / CIRPATTERN16_COUNT) for i in range(1, CIRPATTERN16_COUNT)], mode=Mode.SUBTRACT)
    add([cut_extrude12.rotate(cirpattern16_axis, i * 360 / CIRPATTERN16_COUNT) for i in range(1, CIRPATTERN16_COUNT)], mode=Mode.SUBTRACT)

    # Sketch37 → Cut-Extrude17 (cut)
    with BuildSketch(Plane.XZ.offset(2)):
        Circle(SKETCH37_R)
    extrude(amount=-CUT_EXTRUDE17_DEPTH, mode=Mode.SUBTRACT)

    # Sketch38 → Boss-Extrude18 (add)
    with SkipClean():  # the faces are left unmerged after this step: merging them gives an invalid solid
        with BuildSketch(Plane(origin=(0, 0.5, 0), x_dir=(1, 0, 0), z_dir=(0, 1, 0))):
            with Locations(Location((0, 0, 0), (0, 0, 111.75765302))):
                Circle(SKETCH38_R)
            Circle(SKETCH38_R_2, mode=Mode.SUBTRACT)
        extrude(amount=BOSS_EXTRUDE18_DEPTH)
    add(part.part.scale(1), mode=Mode.REPLACE)  # the faces are merged on a copy

    # Sketch39 → Cut-Extrude18 (cut)
    with BuildSketch(Plane(origin=(0, 2.064918163, -2.064918163), x_dir=(1, 0, 0), z_dir=(-2.4688501310822543e-15, 0.7071067811865508, -0.7071067811865444))):
        with Locations((0, 2.94689243)):
            Rectangle(SKETCH39_W, SKETCH39_H)
    extrude(amount=CUT_EXTRUDE18_DEPTH, mode=Mode.SUBTRACT)



with BuildPart() as body_2:
    # Sketch40 → Boss-Extrude19 (new body)
    with BuildSketch(Plane(origin=(0, 2, 0), x_dir=(1, 0, 0), z_dir=(0, 1, 0))):
        Rectangle(SKETCH40_W, SKETCH40_H)
        Rectangle(SKETCH40_W_2, SKETCH40_H_2, mode=Mode.SUBTRACT)
    extrude(amount=BOSS_EXTRUDE19_DEPTH)


with BuildPart() as part_1:
    with SkipClean():  # the faces are left unmerged after this step: merging them gives an invalid solid
        add(part.part)

        add(body_2.part)  # Boss-Extrude20 merges body 2
        # Sketch41 → Boss-Extrude20 (add)
        with BuildSketch(Plane.XZ.offset(-2).offset(BOSS_EXTRUDE20_START)):
            Rectangle(SKETCH41_W, SKETCH41_H)
            with Locations(Location((0, 0, 0), (0, 0, 294.042710138))):
                Circle(SKETCH41_R, mode=Mode.SUBTRACT)
        extrude(amount=-BOSS_EXTRUDE20_DEPTH)


with BuildPart() as boss_extrude21_tool:
    # Sketch42 → Boss-Extrude21 (with draft: the straight prism first)
    with BuildSketch(Plane.XZ.offset(-1.85)):
        Rectangle(SKETCH42_W, SKETCH42_H)
        with Locations(Location((0, 0, 0), (0, 0, 294.042710138))):
            Circle(SKETCH42_R, mode=Mode.SUBTRACT)
    extrude(amount=BOSS_EXTRUDE21_DEPTH)
    # Boss-Extrude21: the draft: its side faces are tilted about the plane it starts from
    boss_extrude21_sides = [boss_extrude21_tool.faces().sort_by_distance(p)[0] for p in [
        (-4, 1.4830315, 0),
        (0, 1.4830315, -4),
        (4, 1.4830315, 0),
        (0, 1.4830315, 4),
        (-0.892244361, 1.4830315, 2),
    ]]
    draft(boss_extrude21_sides, Plane.XZ.offset(-1.85), BOSS_EXTRUDE21_DRAFT)


with BuildPart() as part_2:
    add(part_1.part)

    # Boss-Extrude21: add boss_extrude21_tool
    add(boss_extrude21_tool.part)

    # Sketch43 → Cut-Extrude19 (cut)
    with BuildSketch(Plane(origin=(0, 2, 0), x_dir=(1, 0, 0), z_dir=(0, 1, 0))):
        Rectangle(SKETCH43_W, SKETCH43_H)
    extrude(amount=CUT_EXTRUDE19_DEPTH, mode=Mode.SUBTRACT)


solid = part_2.part
